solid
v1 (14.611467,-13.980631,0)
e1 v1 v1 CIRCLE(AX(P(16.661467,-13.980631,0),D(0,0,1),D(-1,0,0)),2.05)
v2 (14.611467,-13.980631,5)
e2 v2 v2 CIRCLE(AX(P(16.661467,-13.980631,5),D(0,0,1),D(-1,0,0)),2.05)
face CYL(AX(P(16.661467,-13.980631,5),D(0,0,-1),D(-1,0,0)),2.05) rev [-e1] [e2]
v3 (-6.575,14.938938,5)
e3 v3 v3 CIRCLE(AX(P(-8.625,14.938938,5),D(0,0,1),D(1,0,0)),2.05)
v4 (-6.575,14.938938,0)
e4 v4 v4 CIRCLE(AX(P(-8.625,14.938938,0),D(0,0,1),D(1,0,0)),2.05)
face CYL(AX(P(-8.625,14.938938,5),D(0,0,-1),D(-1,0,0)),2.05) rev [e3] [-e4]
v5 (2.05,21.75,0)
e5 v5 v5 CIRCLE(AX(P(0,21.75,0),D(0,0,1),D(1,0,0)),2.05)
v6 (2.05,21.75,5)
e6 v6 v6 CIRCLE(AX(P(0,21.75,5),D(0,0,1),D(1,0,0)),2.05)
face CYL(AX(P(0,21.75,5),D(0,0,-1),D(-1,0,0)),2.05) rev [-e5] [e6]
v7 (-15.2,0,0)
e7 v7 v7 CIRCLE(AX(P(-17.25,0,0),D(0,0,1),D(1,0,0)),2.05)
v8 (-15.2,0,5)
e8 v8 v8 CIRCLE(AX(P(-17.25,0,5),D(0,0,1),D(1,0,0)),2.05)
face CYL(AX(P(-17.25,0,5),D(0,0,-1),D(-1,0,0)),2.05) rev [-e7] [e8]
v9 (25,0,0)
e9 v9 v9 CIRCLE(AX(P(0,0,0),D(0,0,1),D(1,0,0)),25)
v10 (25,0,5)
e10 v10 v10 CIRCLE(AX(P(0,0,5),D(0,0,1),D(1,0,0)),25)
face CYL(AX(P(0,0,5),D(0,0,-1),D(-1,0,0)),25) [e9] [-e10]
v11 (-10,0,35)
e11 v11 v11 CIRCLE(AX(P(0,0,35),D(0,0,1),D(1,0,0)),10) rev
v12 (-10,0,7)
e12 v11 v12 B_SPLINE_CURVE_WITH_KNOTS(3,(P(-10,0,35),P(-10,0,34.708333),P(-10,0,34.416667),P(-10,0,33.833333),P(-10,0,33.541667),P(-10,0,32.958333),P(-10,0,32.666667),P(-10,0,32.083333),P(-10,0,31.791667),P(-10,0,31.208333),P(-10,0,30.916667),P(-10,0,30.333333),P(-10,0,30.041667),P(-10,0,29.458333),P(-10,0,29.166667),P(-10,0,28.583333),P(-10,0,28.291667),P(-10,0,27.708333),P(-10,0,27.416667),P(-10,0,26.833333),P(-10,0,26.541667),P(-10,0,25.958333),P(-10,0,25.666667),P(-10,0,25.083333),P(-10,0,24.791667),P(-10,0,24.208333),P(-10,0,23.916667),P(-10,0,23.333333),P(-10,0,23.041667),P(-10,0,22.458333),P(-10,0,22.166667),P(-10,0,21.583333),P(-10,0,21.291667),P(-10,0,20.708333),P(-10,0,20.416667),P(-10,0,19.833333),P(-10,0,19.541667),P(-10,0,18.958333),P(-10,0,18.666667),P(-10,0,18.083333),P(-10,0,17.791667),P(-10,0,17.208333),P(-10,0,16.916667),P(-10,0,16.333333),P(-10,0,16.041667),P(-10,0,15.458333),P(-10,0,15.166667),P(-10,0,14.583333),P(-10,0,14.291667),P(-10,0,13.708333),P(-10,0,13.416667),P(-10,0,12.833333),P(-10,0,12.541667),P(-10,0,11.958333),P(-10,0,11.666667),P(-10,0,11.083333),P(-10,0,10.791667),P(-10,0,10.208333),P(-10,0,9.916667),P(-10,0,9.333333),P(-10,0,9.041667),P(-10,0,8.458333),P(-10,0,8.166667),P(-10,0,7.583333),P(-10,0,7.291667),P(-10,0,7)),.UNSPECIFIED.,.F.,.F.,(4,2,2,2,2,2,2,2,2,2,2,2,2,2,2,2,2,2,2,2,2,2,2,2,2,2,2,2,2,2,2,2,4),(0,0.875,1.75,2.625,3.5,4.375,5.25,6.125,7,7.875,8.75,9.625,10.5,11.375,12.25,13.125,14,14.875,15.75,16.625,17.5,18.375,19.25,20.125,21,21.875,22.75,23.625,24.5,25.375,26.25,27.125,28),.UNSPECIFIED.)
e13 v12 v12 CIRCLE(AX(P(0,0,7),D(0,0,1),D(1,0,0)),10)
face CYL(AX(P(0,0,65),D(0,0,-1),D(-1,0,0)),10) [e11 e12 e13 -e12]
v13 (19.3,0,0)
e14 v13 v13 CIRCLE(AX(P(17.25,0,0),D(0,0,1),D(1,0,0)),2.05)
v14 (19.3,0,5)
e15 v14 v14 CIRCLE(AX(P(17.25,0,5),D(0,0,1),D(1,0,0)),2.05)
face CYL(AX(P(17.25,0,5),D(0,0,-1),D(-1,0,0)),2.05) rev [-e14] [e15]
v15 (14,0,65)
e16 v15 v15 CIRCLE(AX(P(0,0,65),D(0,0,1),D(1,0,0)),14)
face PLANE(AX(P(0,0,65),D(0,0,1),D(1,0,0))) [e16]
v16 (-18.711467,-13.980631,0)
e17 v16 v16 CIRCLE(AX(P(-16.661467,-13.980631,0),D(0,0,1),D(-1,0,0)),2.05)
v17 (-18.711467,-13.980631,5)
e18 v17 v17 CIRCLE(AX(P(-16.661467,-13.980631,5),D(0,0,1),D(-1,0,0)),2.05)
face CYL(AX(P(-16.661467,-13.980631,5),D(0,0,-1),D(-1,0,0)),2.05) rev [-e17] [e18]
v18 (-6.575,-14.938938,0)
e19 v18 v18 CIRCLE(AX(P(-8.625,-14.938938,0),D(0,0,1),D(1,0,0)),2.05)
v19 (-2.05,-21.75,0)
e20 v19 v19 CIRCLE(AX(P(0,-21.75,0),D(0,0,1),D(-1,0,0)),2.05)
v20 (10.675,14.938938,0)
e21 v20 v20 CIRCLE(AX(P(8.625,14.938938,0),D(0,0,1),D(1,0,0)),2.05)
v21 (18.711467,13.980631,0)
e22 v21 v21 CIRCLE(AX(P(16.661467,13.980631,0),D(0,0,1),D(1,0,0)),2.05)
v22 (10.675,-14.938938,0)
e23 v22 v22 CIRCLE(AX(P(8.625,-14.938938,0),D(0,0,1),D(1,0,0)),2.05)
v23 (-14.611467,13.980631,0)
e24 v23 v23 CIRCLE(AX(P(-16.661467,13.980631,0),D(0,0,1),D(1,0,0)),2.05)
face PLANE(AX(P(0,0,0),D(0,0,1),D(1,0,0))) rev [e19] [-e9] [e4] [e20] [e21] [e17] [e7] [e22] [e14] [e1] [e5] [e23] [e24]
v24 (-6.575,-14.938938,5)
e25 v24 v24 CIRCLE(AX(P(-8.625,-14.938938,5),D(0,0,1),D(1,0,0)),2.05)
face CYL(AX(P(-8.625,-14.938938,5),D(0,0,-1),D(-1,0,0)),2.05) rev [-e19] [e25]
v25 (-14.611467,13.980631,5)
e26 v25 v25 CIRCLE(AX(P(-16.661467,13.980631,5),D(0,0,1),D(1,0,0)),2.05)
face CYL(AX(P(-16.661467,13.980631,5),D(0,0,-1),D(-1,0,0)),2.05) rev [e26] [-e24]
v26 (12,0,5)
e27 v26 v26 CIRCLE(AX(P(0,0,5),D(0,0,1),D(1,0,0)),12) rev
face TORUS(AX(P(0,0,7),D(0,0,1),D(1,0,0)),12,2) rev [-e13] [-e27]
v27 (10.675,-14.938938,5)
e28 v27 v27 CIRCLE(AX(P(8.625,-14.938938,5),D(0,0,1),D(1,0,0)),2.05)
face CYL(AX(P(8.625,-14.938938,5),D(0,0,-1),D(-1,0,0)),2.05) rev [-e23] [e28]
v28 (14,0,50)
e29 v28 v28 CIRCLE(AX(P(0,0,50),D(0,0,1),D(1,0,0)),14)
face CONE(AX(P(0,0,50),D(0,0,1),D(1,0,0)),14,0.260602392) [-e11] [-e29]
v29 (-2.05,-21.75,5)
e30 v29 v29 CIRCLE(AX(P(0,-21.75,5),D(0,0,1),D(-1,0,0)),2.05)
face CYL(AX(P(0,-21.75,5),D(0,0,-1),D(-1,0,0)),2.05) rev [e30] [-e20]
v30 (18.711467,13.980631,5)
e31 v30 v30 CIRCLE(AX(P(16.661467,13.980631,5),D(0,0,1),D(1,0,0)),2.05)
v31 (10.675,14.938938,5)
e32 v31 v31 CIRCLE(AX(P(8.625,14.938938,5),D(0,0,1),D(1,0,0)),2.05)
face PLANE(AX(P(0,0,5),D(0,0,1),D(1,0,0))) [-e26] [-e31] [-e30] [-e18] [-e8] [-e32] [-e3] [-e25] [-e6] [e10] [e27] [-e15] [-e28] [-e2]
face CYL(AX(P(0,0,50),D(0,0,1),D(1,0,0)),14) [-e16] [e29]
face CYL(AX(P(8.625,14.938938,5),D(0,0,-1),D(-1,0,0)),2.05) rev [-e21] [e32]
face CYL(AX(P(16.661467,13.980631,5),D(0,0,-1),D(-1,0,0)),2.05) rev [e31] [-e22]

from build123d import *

# Parameters (mm, degrees)
SKETCH_1_R       = 25
SKETCH_1_R_2     = 2.05
EXTRUDE_1_DEPTH  = 5
SKETCH_2_R       = 10
EXTRUDE_2_DEPTH  = 60
FILLET_1_R       = 2
SKETCH_4_R       = 14
EXTRUDE_3_DEPTH  = 15
CHAMFER_1_SIZE   = 15
CHAMFER_1_SIZE_2 = 4


with BuildPart() as part:
    # 草图1 → 凸台-拉伸1 (new body)
    with BuildSketch(Plane.XY):
        Circle(SKETCH_1_R)
        with Locations((0, 21.75)):
            Circle(SKETCH_1_R_2, mode=Mode.SUBTRACT)
        with Locations((16.661466638, 13.980630511)):
            Circle(SKETCH_1_R_2, mode=Mode.SUBTRACT)
        with Locations((-16.661466638, 13.980630511)):
            Circle(SKETCH_1_R_2, mode=Mode.SUBTRACT)
        with Locations(Location((16.661466638, -13.980630511, 0), (0, 0, 180))):
            Circle(SKETCH_1_R_2, mode=Mode.SUBTRACT)
        with Locations(Location((0, -21.75, 0), (0, 0, 180))):
            Circle(SKETCH_1_R_2, mode=Mode.SUBTRACT)
        with Locations(Location((-16.661466638, -13.980630511, 0), (0, 0, 180))):
            Circle(SKETCH_1_R_2, mode=Mode.SUBTRACT)
        with Locations((8.625, 14.938938215)):
            Circle(SKETCH_1_R_2, mode=Mode.SUBTRACT)
        with Locations((17.25, 0)):
            Circle(SKETCH_1_R_2, mode=Mode.SUBTRACT)
        with Locations((8.625, -14.938938215)):
            Circle(SKETCH_1_R_2, mode=Mode.SUBTRACT)
        with Locations((-8.625, -14.938938215)):
            Circle(SKETCH_1_R_2, mode=Mode.SUBTRACT)
        with Locations((-17.25, 0)):
            Circle(SKETCH_1_R_2, mode=Mode.SUBTRACT)
        with Locations((-8.625, 14.938938215)):
            Circle(SKETCH_1_R_2, mode=Mode.SUBTRACT)
    extrude(amount=EXTRUDE_1_DEPTH)

    # 草图2 → 凸台-拉伸2 (add)
    with BuildSketch(Plane.XY.offset(5)):
        with Locations(Location((0, 0, 0), (0, 0, 180))):
            Circle(SKETCH_2_R)
    extrude(amount=EXTRUDE_2_DEPTH)

    # 圆角1
    fillet_1_edges = [part.edges().sort_by_distance(p)[0] for p in [
        (10, 0, 5),
    ]]
    fillet(fillet_1_edges, radius=FILLET_1_R)

    # 草图4 → 凸台-拉伸3 (add)
    with BuildSketch(Plane.XY.offset(65)):
        Circle(SKETCH_4_R)
    extrude(amount=-EXTRUDE_3_DEPTH)

    # 倒角1
    # the kernel refuses this chamfer: 15, 4 mm, written as the material it adds along each edge
    with BuildSketch(Plane(origin=(0, 0, 50), x_dir=(-1, 0, 0), z_dir=(0, -1, 0))) as chamfer_1_piece_1_section:
        Polygon((10, CHAMFER_1_SIZE), (10 + CHAMFER_1_SIZE_2, 0), (10, 0), align=None)
    chamfer_1_piece_1 = revolve(axis=Axis((0, 0, 50), (0, 0, -1)), mode=Mode.PRIVATE)
    chamfer_1_piece_1 = chamfer_1_piece_1 & Plane(origin=(0, 0, 42.245414998), x_dir=(1, 0, 0), z_dir=(0, 0, 1)) * Cylinder(14, 60, mode=Mode.PRIVATE)
    add(chamfer_1_piece_1)


solid = part.part
